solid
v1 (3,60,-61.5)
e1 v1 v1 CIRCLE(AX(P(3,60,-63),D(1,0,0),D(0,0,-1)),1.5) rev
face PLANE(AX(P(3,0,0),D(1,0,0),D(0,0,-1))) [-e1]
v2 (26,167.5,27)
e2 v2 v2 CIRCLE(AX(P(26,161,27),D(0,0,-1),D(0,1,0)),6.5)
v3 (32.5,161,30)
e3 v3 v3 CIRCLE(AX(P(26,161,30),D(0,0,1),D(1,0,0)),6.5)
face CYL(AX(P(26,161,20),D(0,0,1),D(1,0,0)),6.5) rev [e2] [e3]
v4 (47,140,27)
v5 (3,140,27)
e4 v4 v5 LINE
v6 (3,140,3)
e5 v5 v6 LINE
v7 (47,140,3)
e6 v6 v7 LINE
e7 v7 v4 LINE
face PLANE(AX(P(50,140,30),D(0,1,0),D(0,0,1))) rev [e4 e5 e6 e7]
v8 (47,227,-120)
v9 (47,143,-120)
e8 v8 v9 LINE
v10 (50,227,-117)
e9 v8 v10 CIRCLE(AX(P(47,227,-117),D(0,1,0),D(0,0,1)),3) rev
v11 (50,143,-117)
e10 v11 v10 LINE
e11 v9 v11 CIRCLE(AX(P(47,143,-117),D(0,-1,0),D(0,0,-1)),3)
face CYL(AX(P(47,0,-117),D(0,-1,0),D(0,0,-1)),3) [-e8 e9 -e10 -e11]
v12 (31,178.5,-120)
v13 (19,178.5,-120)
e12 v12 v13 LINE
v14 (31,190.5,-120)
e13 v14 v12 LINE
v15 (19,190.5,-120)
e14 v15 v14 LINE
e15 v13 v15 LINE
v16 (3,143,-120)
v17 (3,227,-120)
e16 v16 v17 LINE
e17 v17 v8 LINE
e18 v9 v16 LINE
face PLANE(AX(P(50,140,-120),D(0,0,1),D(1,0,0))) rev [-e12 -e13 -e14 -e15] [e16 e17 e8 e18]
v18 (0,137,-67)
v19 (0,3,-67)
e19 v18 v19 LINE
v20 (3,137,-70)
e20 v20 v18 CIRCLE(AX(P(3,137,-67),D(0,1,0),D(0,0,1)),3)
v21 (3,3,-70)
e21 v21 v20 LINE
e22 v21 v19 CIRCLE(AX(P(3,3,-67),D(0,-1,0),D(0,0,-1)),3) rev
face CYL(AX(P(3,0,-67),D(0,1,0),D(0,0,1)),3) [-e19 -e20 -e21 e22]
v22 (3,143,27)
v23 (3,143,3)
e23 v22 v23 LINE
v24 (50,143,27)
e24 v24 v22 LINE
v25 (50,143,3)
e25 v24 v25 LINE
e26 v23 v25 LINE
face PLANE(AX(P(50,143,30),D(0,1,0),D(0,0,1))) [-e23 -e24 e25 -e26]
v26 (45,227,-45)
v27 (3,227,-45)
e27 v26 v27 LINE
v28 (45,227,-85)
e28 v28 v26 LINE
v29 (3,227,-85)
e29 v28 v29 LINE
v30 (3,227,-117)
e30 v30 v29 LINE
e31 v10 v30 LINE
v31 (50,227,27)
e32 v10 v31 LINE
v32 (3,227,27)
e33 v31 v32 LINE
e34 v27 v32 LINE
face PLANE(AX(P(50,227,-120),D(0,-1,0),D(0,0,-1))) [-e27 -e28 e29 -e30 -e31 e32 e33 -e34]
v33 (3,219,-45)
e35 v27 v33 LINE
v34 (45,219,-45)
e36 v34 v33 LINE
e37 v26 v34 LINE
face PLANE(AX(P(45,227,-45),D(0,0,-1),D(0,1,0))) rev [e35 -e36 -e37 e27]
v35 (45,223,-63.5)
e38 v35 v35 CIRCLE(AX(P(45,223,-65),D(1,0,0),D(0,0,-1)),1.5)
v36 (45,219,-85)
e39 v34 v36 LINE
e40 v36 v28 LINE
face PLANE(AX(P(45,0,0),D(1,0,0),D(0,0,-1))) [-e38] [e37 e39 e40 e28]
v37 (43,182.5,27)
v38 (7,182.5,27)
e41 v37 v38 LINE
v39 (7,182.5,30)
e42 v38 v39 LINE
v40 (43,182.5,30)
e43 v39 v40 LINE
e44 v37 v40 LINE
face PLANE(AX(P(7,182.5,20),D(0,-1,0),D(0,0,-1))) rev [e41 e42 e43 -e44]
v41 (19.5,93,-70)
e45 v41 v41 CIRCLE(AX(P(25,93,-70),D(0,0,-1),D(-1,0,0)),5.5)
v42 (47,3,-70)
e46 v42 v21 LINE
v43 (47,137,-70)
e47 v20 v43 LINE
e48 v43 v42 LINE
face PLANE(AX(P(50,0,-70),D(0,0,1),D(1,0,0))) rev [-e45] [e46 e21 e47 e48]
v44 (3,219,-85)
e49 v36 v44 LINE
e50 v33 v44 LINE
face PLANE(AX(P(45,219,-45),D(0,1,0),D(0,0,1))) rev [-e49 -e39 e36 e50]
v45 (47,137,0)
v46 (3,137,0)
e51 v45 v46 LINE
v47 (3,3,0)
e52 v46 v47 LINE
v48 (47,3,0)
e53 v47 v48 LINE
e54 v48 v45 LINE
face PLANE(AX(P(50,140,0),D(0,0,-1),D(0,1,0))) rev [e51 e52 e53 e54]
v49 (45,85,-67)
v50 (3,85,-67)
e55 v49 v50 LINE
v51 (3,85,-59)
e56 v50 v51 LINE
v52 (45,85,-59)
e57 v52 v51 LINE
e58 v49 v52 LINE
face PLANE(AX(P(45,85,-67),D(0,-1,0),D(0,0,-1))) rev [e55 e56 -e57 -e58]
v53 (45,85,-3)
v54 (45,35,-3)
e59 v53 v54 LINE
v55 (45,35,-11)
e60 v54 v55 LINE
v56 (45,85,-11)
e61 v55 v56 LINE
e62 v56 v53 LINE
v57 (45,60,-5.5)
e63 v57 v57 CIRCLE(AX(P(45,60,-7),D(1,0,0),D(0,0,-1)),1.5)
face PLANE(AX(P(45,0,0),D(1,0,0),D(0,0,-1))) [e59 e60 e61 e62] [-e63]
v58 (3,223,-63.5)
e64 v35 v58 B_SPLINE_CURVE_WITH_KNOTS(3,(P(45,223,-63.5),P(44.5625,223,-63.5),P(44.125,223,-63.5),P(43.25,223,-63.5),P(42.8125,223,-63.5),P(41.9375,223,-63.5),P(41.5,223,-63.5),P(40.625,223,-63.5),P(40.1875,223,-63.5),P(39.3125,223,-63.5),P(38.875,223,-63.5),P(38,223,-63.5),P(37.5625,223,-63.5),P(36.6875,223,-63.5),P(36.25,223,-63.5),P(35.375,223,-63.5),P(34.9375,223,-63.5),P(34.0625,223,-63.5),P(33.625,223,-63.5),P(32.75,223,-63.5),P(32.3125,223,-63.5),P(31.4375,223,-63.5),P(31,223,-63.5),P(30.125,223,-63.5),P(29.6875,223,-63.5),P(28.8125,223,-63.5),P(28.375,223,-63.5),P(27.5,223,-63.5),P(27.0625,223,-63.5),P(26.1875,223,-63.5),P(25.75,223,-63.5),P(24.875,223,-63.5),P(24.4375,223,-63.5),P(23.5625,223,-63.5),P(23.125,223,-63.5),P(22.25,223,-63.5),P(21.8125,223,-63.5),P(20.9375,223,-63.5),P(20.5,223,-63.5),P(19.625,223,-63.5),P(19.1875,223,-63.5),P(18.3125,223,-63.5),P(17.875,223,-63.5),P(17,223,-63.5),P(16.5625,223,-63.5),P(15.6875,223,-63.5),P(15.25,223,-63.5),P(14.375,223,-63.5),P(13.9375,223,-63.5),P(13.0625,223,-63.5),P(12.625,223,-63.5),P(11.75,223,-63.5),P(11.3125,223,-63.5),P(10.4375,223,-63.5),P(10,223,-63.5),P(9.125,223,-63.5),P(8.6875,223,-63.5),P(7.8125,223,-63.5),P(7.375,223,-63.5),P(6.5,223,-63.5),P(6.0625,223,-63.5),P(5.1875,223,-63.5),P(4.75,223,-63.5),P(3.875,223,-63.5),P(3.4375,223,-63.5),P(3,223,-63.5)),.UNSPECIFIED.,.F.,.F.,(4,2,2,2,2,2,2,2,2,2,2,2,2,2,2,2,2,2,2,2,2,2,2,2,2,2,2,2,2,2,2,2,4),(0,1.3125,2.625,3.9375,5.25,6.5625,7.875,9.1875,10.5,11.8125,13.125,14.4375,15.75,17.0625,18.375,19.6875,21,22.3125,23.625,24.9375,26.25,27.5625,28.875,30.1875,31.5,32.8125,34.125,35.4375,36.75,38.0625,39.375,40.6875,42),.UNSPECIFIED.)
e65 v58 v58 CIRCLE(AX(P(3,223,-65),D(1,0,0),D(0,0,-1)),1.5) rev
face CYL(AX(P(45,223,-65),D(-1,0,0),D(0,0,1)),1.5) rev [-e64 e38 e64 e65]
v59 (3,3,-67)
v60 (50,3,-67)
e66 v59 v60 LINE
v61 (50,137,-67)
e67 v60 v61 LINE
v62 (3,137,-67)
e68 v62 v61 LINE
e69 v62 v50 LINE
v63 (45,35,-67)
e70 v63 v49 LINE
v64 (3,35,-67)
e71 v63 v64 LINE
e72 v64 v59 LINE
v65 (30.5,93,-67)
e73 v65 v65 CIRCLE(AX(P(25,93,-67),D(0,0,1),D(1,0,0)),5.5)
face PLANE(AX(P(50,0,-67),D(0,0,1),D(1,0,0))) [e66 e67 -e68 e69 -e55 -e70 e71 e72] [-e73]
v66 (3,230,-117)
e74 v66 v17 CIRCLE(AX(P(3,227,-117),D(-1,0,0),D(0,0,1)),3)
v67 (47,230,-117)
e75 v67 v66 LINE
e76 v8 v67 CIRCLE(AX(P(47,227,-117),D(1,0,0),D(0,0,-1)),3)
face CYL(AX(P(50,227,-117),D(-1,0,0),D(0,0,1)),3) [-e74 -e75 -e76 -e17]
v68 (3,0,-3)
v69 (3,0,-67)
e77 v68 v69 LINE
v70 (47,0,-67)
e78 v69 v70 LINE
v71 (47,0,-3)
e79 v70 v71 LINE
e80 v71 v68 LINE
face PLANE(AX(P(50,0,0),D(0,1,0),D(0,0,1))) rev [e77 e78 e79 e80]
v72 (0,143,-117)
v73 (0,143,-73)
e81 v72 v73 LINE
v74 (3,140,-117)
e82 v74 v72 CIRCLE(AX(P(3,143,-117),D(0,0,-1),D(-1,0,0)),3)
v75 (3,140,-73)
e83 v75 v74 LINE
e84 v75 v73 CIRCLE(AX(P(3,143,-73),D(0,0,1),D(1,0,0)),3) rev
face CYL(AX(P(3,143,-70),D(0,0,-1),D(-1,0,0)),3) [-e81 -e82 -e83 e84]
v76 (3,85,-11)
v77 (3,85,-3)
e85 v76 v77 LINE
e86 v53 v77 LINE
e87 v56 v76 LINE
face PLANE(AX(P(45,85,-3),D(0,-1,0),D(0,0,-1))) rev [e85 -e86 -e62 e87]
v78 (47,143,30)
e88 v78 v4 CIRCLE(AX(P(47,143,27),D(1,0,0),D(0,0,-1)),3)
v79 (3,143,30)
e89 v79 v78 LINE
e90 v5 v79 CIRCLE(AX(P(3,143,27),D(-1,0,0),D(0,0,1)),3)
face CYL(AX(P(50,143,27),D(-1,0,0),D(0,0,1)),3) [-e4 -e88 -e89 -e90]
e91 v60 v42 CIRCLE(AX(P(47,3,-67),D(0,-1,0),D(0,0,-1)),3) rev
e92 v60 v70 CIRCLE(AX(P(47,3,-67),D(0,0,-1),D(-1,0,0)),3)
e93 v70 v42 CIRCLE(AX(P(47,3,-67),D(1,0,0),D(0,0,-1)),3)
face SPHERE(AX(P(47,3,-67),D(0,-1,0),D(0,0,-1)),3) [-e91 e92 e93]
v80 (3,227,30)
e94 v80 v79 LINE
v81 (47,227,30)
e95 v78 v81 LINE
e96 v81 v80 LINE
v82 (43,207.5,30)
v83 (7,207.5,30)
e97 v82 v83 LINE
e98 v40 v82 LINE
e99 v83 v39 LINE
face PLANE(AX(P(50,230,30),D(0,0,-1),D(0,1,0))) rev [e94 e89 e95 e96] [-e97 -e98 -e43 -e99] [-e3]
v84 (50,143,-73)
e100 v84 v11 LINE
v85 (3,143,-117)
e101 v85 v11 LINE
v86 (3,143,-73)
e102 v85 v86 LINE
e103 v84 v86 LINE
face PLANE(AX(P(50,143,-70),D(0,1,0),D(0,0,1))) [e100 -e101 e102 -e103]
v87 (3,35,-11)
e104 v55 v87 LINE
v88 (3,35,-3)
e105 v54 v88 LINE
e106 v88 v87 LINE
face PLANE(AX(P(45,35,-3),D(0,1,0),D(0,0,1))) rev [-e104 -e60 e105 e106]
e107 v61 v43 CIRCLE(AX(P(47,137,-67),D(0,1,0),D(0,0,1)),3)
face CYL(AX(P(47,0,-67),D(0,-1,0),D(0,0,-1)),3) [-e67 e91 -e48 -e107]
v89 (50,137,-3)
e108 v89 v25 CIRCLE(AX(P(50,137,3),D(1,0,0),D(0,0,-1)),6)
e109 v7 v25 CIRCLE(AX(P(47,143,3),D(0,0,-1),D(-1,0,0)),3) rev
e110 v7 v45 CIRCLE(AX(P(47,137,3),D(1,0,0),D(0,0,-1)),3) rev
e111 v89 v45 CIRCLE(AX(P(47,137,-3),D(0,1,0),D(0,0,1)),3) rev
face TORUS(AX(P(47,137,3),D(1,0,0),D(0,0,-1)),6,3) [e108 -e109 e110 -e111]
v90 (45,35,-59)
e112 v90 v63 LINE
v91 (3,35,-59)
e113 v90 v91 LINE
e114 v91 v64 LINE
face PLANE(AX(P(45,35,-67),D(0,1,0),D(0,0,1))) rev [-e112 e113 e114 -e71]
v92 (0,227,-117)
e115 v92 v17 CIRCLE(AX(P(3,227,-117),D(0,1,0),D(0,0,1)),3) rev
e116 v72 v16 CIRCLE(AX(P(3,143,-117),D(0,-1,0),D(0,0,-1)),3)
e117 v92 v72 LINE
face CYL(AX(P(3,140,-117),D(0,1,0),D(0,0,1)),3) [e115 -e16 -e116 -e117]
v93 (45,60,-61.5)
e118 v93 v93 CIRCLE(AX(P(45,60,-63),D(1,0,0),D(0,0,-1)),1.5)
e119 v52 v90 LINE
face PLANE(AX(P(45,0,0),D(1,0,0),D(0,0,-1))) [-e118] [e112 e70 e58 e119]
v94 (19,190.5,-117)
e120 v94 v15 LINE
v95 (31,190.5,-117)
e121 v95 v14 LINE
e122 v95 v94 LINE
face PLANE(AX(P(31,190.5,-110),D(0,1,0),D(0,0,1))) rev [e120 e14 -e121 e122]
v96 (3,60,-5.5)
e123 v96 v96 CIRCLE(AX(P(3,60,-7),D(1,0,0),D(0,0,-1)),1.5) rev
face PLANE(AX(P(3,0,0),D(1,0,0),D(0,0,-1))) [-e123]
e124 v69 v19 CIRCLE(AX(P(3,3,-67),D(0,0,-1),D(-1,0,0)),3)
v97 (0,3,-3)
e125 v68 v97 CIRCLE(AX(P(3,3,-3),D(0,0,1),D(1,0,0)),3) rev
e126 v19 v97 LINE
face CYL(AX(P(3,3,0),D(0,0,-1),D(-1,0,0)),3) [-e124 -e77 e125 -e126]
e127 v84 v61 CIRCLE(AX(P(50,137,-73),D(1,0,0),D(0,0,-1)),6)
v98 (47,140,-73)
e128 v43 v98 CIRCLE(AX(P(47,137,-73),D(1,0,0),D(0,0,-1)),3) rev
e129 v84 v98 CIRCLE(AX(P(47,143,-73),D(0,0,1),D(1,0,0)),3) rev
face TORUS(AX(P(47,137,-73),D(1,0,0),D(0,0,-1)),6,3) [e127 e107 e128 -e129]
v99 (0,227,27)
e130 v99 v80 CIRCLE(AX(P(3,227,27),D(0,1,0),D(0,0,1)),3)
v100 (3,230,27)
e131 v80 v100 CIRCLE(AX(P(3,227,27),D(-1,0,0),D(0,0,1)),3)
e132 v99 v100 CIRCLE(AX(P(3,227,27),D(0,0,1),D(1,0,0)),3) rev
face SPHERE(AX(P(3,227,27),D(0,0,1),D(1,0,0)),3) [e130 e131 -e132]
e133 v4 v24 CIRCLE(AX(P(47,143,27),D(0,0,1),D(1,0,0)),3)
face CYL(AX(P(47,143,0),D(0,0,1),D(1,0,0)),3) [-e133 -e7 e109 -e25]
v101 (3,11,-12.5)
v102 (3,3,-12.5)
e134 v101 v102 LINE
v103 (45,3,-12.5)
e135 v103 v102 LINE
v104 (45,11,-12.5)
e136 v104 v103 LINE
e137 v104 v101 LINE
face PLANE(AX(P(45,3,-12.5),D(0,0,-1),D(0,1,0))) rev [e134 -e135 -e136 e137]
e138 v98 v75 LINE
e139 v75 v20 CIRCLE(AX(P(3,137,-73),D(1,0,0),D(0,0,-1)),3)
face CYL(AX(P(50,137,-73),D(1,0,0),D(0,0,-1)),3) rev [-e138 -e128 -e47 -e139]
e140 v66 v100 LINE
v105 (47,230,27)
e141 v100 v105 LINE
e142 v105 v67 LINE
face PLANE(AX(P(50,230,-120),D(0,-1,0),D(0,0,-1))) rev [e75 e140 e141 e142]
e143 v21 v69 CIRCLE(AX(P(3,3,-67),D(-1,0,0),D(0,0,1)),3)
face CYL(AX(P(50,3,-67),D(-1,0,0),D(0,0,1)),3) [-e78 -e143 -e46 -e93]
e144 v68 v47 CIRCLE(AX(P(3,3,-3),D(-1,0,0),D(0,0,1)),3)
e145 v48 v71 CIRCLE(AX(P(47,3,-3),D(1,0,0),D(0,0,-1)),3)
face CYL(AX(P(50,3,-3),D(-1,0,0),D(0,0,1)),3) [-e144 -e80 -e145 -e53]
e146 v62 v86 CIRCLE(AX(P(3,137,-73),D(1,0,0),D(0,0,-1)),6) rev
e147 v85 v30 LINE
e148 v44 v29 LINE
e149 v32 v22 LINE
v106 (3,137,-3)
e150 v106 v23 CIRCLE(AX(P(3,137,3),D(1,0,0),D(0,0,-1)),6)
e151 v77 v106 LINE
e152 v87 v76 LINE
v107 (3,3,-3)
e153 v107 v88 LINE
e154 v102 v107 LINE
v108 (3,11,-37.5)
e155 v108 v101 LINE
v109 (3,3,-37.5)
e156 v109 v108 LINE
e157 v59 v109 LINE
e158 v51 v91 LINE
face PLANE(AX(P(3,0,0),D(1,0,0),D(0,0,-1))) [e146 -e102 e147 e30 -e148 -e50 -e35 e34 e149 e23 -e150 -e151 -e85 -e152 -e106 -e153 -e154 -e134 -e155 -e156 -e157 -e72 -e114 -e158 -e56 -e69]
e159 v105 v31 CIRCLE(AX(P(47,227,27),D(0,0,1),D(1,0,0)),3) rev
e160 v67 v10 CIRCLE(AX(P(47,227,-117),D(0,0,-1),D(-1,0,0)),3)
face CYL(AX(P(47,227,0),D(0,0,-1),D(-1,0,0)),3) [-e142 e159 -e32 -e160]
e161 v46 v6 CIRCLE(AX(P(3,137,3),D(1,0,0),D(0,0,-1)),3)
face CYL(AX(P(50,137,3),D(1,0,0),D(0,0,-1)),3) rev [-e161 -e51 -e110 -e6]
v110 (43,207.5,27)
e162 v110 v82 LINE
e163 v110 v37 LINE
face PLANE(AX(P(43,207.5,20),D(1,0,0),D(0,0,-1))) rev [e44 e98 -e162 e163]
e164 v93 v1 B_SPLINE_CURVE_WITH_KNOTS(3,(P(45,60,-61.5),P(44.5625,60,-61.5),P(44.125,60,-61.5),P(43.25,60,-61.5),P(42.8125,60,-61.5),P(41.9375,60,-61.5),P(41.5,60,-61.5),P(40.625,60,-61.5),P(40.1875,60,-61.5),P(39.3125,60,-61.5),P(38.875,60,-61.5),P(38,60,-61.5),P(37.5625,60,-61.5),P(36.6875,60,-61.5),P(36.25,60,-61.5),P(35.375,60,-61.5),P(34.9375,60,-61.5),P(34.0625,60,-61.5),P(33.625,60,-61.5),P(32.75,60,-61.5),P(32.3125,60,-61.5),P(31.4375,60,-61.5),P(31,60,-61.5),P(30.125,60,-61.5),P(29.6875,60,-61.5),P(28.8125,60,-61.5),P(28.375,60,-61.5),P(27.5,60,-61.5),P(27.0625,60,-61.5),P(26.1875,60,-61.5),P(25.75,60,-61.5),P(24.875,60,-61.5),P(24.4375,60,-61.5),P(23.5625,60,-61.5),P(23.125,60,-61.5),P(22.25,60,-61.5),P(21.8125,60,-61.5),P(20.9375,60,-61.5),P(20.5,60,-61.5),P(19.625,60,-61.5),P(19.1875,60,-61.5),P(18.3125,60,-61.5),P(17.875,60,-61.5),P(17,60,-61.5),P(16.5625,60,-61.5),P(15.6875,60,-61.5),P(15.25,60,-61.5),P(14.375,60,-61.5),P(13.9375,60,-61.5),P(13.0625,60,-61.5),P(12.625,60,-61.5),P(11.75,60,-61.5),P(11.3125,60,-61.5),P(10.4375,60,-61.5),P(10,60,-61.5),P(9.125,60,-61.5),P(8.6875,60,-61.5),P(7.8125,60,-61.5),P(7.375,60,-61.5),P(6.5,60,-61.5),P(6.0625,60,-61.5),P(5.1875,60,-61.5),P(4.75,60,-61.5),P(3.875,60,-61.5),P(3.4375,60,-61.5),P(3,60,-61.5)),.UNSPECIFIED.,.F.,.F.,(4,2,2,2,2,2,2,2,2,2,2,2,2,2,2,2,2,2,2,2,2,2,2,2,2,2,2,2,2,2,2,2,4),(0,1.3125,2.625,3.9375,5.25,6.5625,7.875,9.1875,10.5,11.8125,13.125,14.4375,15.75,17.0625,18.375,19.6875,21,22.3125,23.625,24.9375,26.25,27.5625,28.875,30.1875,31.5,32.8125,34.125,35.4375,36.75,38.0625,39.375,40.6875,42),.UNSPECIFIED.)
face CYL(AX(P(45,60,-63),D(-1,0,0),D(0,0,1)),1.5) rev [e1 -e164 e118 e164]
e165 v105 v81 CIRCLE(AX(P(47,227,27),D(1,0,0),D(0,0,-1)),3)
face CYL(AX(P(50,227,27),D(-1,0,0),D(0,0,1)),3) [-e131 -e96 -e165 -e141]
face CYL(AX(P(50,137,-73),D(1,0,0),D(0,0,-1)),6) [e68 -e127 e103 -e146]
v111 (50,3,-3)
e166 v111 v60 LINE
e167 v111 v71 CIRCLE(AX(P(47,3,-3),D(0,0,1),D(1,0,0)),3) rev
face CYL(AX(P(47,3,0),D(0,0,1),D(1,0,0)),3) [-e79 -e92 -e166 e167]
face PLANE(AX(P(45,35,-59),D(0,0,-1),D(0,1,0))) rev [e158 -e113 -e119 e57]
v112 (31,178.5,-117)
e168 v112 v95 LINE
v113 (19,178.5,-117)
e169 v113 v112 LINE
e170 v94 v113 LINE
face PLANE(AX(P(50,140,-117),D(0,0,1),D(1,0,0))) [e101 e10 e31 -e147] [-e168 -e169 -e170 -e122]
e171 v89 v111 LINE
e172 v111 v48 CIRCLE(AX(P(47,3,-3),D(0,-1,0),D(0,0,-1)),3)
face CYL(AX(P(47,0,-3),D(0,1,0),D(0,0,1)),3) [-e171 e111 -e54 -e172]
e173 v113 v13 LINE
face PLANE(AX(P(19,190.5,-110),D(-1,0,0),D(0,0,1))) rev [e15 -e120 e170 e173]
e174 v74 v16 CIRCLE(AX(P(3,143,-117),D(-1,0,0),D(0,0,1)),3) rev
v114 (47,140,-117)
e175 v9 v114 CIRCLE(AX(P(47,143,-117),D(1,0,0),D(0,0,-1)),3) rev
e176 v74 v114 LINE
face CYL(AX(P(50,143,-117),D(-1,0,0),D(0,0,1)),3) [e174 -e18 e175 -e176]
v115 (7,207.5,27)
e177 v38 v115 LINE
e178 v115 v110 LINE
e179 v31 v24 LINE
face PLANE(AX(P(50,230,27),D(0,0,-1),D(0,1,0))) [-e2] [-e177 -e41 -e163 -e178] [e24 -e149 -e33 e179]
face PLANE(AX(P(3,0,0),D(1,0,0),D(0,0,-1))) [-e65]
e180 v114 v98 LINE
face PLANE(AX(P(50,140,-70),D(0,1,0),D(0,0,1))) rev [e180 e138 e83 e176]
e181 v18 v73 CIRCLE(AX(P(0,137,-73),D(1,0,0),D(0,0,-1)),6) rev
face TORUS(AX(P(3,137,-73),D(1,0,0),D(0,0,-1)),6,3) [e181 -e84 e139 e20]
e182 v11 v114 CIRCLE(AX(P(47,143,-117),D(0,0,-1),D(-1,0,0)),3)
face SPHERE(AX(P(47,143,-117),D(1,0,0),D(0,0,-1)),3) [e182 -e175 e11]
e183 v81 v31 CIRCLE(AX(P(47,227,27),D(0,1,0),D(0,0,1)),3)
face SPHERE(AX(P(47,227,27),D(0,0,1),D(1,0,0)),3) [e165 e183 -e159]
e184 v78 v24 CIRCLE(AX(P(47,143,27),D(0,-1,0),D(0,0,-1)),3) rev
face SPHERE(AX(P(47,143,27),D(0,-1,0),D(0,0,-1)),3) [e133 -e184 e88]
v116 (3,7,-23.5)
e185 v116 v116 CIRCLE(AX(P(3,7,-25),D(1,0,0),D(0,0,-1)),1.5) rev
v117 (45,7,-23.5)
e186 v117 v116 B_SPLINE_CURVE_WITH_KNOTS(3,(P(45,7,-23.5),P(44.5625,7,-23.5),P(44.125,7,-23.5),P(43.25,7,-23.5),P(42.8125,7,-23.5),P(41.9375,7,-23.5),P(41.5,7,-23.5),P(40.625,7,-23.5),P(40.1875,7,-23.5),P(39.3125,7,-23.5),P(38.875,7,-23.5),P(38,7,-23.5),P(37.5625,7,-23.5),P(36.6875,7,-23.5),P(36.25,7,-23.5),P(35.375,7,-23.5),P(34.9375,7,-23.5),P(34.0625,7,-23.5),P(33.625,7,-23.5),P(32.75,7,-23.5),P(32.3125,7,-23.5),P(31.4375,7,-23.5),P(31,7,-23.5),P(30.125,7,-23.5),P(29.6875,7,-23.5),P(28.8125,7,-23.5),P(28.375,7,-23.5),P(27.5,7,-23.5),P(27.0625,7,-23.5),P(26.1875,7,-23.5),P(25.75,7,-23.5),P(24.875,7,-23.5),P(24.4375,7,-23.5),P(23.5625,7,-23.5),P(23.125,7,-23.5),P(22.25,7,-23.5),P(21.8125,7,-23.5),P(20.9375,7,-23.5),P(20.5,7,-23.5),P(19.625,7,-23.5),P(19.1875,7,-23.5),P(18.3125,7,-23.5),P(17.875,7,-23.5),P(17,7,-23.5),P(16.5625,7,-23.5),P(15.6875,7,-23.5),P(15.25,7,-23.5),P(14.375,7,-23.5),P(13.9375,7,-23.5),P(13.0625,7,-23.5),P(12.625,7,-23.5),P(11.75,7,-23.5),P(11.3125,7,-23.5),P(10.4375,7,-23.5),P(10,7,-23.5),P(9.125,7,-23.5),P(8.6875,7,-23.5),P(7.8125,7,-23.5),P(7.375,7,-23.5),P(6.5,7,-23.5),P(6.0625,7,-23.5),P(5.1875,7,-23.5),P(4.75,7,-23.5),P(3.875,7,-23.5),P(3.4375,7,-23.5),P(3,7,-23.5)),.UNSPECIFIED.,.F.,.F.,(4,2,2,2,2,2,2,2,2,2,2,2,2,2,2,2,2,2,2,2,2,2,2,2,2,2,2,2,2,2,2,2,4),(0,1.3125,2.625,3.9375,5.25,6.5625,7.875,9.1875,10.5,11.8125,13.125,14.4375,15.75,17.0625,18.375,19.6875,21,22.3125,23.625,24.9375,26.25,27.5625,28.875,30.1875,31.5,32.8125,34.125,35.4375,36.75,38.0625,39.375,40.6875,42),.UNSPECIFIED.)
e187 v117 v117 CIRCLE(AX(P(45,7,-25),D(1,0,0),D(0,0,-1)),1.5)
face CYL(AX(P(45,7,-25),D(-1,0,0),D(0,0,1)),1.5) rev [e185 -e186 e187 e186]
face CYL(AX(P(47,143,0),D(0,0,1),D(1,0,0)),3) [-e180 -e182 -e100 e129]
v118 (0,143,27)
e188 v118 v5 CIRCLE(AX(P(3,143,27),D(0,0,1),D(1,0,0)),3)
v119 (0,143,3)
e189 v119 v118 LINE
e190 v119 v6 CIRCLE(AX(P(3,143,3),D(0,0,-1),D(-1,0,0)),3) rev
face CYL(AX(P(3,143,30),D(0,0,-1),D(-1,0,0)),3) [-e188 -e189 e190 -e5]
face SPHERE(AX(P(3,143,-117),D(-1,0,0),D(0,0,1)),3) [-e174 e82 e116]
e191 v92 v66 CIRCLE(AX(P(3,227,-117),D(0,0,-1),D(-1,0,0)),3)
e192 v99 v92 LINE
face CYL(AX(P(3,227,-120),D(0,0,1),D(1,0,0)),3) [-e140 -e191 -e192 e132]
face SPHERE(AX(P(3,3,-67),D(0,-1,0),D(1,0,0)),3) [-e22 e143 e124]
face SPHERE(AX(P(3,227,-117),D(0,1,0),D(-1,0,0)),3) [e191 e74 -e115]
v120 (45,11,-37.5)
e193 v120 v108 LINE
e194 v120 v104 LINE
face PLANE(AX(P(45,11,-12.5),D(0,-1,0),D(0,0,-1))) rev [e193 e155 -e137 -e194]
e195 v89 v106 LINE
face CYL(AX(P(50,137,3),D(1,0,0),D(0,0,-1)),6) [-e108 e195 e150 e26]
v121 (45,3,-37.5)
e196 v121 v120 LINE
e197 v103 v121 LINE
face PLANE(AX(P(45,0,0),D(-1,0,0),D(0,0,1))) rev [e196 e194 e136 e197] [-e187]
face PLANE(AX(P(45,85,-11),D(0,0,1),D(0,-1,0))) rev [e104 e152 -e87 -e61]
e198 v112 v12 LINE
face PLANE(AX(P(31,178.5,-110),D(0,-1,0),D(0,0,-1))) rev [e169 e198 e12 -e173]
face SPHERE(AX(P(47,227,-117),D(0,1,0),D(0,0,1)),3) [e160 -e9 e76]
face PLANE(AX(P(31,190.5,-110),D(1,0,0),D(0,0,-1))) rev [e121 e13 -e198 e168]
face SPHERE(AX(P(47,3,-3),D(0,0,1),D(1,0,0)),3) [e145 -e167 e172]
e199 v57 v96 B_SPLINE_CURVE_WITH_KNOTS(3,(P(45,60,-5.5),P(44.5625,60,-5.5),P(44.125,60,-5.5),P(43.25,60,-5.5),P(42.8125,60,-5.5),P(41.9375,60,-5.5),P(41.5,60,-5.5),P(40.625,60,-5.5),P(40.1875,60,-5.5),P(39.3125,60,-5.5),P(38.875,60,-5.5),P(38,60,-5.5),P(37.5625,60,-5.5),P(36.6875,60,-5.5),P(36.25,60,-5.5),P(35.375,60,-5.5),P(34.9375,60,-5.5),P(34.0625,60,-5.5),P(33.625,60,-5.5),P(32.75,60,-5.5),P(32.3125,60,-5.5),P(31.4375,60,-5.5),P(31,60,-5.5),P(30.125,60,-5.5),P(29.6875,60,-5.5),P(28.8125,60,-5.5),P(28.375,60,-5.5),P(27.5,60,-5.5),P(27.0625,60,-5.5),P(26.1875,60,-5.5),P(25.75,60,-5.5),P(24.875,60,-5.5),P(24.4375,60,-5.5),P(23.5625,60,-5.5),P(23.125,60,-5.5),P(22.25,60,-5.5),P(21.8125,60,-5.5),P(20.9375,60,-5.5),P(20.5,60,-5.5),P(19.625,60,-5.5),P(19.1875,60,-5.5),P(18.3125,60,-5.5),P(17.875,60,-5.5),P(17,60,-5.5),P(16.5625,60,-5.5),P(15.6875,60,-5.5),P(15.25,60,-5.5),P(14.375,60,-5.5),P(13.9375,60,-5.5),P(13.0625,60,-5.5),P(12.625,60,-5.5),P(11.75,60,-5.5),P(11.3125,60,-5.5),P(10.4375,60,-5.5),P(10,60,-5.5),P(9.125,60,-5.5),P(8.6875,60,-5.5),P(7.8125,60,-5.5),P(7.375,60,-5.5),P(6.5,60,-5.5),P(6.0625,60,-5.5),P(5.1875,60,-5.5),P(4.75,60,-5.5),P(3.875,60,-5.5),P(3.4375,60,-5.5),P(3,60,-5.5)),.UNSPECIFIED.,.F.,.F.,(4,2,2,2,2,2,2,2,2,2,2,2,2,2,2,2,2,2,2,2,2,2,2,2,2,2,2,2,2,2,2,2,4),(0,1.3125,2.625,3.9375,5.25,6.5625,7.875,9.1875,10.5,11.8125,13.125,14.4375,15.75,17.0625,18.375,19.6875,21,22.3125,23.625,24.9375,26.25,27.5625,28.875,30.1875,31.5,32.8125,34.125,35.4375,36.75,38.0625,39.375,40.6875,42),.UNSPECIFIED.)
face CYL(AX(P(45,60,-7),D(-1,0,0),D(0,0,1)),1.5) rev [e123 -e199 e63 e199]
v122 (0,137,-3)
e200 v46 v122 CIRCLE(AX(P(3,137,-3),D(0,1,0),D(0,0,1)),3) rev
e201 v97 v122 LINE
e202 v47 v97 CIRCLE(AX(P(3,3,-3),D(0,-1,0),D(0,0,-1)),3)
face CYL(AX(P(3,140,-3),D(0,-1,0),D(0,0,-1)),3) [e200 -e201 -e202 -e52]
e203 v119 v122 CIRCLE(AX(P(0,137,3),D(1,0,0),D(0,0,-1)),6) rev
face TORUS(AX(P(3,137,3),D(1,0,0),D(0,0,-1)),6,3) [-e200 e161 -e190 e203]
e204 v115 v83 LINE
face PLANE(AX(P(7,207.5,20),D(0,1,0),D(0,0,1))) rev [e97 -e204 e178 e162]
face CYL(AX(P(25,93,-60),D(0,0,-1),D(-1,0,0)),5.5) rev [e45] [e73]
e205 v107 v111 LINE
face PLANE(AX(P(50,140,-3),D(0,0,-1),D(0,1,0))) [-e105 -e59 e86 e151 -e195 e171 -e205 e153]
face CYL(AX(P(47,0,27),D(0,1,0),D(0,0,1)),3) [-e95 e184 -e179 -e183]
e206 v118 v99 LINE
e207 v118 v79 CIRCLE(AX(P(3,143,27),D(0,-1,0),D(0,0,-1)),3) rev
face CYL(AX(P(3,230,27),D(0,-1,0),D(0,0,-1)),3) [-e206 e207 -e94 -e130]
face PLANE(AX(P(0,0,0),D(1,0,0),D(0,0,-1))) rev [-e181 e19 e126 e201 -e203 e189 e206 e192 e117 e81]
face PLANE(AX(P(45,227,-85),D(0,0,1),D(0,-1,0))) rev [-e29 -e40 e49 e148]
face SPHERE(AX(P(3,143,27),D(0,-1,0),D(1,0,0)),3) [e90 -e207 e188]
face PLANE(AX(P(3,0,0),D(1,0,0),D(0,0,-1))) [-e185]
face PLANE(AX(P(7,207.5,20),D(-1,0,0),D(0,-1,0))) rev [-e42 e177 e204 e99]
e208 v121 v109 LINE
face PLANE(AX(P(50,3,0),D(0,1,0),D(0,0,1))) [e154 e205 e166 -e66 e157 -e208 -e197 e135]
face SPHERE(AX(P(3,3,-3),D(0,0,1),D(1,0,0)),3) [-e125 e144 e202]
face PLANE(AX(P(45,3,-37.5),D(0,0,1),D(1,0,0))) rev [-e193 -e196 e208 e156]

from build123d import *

# Parameters (mm, degrees)
BOSS_EXTRU_1_DEPTH      = 50
CONG_1_R                = 3
COQUE2_START            = 3
COQUE2_DEPTH            = 47
ESQUISSE2_W             = 40
ESQUISSE2_H             = 8
ESQUISSE2_R             = 1.5
ESQUISSE2_W_2           = 8
ESQUISSE2_H_2           = 50
ESQUISSE2_W_3           = 25
BOSS_EXTRU_3_DEPTH      = 42
ESQUISSE3_W             = 36
ESQUISSE3_H             = 25
ENL_V_MAT_EXTRU_1_DEPTH = 10
ESQUISSE5_R             = 6.5
ENL_V_MAT_EXTRU_2_DEPTH = 10
ESQUISSE6_R             = 5.5
ENL_V_MAT_EXTRU_3_DEPTH = 10
ESQUISSE7_W             = 12
ESQUISSE7_H             = 12
ENL_V_MAT_EXTRU_4_DEPTH = 10


# Read off the part's stored shape, not the designer's step: Coque2
with BuildPart() as part:
    # Esquisse1 → Boss.-Extru.1 (new body)
    with BuildSketch(Plane(origin=(0, 0, 0), x_dir=(0, 0, -1), z_dir=(1, 0, 0))):
        Polygon((0, 0), (70, 0), (70, 140), (120, 140), (120, 230), (-30, 230), (-30, 140), (0, 140), align=None)
    extrude(amount=BOSS_EXTRU_1_DEPTH)

    # Congé1
    cong_1_edges = [part.edges().sort_by_distance(p)[0] for p in [
        (0, 140, -95),
        (0, 70, -70),
        (0, 0, -35),
        (0, 70, 0),
        (50, 70, -70),
        (25, 140, 0),
        (25, 140, 30),
        (25, 230, 30),
        (25, 230, -120),
        (25, 140, -120),
        (25, 140, -70),
        (25, 0, -70),
        (25, 0, 0),
        (50, 140, -95),
        (50, 185, -120),
        (50, 230, -45),
        (50, 185, 30),
        (50, 140, 15),
        (50, 70, 0),
        (0, 140, 15),
        (50, 0, -35),
        (0, 185, 30),
        (0, 230, -45),
        (0, 185, -120),
    ]]
    fillet(cong_1_edges, radius=CONG_1_R)

    # Coque2 outline → Coque2 (cut)
    with BuildSketch(Plane.YZ.offset(COQUE2_START)):
        with BuildLine():
            Line((137, -3), (3, -3))
            Line((3, -3), (3, -67))
            Line((3, -67), (137, -67))
            ThreePointArc((137, -67), (141.242640687, -68.757359313), (143, -73))
            Line((143, -73), (143, -117))
            Line((143, -117), (227, -117))
            Line((227, -117), (227, 27))
            Line((227, 27), (143, 27))
            Line((143, 27), (143, 3))
            ThreePointArc((143, 3), (141.242640687, -1.242640687), (137, -3))
        make_face()
    extrude(amount=COQUE2_DEPTH, mode=Mode.SUBTRACT)

    # Esquisse2 → Boss.-Extru.3 (add)
    # profile 1 of 4: a face of its own
    with BuildSketch(Plane(origin=(3, 0, 0), x_dir=(0, 0, -1), z_dir=(1, 0, 0))):
        with Locations((65, 223)):
            Rectangle(ESQUISSE2_W, ESQUISSE2_H)
        with Locations(Location((65, 223, 0), (0, 0, 180))):
            Circle(ESQUISSE2_R, mode=Mode.SUBTRACT)
    # profile 2 of 4: a face of its own
    with BuildSketch(Plane(origin=(3, 0, 0), x_dir=(0, 0, -1), z_dir=(1, 0, 0))):
        with Locations((7, 60)):
            Rectangle(ESQUISSE2_W_2, ESQUISSE2_H_2)
        with Locations(Location((7, 60, 0), (0, 0, 180))):
            Circle(ESQUISSE2_R, mode=Mode.SUBTRACT)
    # profile 3 of 4: a face of its own
    with BuildSketch(Plane(origin=(3, 0, 0), x_dir=(0, 0, -1), z_dir=(1, 0, 0))):
        with Locations((63, 60)):
            Rectangle(ESQUISSE2_W_2, ESQUISSE2_H_2)
        with Locations(Location((63, 60, 0), (0, 0, 180))):
            Circle(ESQUISSE2_R, mode=Mode.SUBTRACT)
    # profile 4 of 4: a face of its own
    with BuildSketch(Plane(origin=(3, 0, 0), x_dir=(0, 0, -1), z_dir=(1, 0, 0))):
        with Locations((25, 7)):
            Rectangle(ESQUISSE2_W_3, ESQUISSE2_H)
        with Locations(Location((25, 7, 0), (0, 0, 180))):
            Circle(ESQUISSE2_R, mode=Mode.SUBTRACT)
    extrude(amount=BOSS_EXTRU_3_DEPTH)

    # Esquisse3 → Enlèv. mat.-Extru.1 (cut)
    with BuildSketch(Plane.XY.offset(30)):
        with Locations((25, 195)):
            Rectangle(ESQUISSE3_W, ESQUISSE3_H)
    extrude(amount=-ENL_V_MAT_EXTRU_1_DEPTH, mode=Mode.SUBTRACT)

    # Esquisse5 → Enlèv. mat.-Extru.2 (cut)
    with BuildSketch(Plane.XY.offset(30)):
        with Locations((26, 161)):
            Circle(ESQUISSE5_R)
    extrude(amount=-ENL_V_MAT_EXTRU_2_DEPTH, mode=Mode.SUBTRACT)

    # Esquisse6 → Enlèv. mat.-Extru.3 (cut)
    with BuildSketch(Plane(origin=(0, 0, -70), x_dir=(-1, 0, 0), z_dir=(0, 0, -1))):
        with Locations((-25, 93)):
            Circle(ESQUISSE6_R)
    extrude(amount=-ENL_V_MAT_EXTRU_3_DEPTH, mode=Mode.SUBTRACT)

    # Esquisse7 → Enlèv. mat.-Extru.4 (cut)
    with BuildSketch(Plane(origin=(0, 0, -120), x_dir=(-1, 0, 0), z_dir=(0, 0, -1))):
        with Locations((-25, 184.5)):
            Rectangle(ESQUISSE7_W, ESQUISSE7_H)
    extrude(amount=-ENL_V_MAT_EXTRU_4_DEPTH, mode=Mode.SUBTRACT)


solid = part.part
